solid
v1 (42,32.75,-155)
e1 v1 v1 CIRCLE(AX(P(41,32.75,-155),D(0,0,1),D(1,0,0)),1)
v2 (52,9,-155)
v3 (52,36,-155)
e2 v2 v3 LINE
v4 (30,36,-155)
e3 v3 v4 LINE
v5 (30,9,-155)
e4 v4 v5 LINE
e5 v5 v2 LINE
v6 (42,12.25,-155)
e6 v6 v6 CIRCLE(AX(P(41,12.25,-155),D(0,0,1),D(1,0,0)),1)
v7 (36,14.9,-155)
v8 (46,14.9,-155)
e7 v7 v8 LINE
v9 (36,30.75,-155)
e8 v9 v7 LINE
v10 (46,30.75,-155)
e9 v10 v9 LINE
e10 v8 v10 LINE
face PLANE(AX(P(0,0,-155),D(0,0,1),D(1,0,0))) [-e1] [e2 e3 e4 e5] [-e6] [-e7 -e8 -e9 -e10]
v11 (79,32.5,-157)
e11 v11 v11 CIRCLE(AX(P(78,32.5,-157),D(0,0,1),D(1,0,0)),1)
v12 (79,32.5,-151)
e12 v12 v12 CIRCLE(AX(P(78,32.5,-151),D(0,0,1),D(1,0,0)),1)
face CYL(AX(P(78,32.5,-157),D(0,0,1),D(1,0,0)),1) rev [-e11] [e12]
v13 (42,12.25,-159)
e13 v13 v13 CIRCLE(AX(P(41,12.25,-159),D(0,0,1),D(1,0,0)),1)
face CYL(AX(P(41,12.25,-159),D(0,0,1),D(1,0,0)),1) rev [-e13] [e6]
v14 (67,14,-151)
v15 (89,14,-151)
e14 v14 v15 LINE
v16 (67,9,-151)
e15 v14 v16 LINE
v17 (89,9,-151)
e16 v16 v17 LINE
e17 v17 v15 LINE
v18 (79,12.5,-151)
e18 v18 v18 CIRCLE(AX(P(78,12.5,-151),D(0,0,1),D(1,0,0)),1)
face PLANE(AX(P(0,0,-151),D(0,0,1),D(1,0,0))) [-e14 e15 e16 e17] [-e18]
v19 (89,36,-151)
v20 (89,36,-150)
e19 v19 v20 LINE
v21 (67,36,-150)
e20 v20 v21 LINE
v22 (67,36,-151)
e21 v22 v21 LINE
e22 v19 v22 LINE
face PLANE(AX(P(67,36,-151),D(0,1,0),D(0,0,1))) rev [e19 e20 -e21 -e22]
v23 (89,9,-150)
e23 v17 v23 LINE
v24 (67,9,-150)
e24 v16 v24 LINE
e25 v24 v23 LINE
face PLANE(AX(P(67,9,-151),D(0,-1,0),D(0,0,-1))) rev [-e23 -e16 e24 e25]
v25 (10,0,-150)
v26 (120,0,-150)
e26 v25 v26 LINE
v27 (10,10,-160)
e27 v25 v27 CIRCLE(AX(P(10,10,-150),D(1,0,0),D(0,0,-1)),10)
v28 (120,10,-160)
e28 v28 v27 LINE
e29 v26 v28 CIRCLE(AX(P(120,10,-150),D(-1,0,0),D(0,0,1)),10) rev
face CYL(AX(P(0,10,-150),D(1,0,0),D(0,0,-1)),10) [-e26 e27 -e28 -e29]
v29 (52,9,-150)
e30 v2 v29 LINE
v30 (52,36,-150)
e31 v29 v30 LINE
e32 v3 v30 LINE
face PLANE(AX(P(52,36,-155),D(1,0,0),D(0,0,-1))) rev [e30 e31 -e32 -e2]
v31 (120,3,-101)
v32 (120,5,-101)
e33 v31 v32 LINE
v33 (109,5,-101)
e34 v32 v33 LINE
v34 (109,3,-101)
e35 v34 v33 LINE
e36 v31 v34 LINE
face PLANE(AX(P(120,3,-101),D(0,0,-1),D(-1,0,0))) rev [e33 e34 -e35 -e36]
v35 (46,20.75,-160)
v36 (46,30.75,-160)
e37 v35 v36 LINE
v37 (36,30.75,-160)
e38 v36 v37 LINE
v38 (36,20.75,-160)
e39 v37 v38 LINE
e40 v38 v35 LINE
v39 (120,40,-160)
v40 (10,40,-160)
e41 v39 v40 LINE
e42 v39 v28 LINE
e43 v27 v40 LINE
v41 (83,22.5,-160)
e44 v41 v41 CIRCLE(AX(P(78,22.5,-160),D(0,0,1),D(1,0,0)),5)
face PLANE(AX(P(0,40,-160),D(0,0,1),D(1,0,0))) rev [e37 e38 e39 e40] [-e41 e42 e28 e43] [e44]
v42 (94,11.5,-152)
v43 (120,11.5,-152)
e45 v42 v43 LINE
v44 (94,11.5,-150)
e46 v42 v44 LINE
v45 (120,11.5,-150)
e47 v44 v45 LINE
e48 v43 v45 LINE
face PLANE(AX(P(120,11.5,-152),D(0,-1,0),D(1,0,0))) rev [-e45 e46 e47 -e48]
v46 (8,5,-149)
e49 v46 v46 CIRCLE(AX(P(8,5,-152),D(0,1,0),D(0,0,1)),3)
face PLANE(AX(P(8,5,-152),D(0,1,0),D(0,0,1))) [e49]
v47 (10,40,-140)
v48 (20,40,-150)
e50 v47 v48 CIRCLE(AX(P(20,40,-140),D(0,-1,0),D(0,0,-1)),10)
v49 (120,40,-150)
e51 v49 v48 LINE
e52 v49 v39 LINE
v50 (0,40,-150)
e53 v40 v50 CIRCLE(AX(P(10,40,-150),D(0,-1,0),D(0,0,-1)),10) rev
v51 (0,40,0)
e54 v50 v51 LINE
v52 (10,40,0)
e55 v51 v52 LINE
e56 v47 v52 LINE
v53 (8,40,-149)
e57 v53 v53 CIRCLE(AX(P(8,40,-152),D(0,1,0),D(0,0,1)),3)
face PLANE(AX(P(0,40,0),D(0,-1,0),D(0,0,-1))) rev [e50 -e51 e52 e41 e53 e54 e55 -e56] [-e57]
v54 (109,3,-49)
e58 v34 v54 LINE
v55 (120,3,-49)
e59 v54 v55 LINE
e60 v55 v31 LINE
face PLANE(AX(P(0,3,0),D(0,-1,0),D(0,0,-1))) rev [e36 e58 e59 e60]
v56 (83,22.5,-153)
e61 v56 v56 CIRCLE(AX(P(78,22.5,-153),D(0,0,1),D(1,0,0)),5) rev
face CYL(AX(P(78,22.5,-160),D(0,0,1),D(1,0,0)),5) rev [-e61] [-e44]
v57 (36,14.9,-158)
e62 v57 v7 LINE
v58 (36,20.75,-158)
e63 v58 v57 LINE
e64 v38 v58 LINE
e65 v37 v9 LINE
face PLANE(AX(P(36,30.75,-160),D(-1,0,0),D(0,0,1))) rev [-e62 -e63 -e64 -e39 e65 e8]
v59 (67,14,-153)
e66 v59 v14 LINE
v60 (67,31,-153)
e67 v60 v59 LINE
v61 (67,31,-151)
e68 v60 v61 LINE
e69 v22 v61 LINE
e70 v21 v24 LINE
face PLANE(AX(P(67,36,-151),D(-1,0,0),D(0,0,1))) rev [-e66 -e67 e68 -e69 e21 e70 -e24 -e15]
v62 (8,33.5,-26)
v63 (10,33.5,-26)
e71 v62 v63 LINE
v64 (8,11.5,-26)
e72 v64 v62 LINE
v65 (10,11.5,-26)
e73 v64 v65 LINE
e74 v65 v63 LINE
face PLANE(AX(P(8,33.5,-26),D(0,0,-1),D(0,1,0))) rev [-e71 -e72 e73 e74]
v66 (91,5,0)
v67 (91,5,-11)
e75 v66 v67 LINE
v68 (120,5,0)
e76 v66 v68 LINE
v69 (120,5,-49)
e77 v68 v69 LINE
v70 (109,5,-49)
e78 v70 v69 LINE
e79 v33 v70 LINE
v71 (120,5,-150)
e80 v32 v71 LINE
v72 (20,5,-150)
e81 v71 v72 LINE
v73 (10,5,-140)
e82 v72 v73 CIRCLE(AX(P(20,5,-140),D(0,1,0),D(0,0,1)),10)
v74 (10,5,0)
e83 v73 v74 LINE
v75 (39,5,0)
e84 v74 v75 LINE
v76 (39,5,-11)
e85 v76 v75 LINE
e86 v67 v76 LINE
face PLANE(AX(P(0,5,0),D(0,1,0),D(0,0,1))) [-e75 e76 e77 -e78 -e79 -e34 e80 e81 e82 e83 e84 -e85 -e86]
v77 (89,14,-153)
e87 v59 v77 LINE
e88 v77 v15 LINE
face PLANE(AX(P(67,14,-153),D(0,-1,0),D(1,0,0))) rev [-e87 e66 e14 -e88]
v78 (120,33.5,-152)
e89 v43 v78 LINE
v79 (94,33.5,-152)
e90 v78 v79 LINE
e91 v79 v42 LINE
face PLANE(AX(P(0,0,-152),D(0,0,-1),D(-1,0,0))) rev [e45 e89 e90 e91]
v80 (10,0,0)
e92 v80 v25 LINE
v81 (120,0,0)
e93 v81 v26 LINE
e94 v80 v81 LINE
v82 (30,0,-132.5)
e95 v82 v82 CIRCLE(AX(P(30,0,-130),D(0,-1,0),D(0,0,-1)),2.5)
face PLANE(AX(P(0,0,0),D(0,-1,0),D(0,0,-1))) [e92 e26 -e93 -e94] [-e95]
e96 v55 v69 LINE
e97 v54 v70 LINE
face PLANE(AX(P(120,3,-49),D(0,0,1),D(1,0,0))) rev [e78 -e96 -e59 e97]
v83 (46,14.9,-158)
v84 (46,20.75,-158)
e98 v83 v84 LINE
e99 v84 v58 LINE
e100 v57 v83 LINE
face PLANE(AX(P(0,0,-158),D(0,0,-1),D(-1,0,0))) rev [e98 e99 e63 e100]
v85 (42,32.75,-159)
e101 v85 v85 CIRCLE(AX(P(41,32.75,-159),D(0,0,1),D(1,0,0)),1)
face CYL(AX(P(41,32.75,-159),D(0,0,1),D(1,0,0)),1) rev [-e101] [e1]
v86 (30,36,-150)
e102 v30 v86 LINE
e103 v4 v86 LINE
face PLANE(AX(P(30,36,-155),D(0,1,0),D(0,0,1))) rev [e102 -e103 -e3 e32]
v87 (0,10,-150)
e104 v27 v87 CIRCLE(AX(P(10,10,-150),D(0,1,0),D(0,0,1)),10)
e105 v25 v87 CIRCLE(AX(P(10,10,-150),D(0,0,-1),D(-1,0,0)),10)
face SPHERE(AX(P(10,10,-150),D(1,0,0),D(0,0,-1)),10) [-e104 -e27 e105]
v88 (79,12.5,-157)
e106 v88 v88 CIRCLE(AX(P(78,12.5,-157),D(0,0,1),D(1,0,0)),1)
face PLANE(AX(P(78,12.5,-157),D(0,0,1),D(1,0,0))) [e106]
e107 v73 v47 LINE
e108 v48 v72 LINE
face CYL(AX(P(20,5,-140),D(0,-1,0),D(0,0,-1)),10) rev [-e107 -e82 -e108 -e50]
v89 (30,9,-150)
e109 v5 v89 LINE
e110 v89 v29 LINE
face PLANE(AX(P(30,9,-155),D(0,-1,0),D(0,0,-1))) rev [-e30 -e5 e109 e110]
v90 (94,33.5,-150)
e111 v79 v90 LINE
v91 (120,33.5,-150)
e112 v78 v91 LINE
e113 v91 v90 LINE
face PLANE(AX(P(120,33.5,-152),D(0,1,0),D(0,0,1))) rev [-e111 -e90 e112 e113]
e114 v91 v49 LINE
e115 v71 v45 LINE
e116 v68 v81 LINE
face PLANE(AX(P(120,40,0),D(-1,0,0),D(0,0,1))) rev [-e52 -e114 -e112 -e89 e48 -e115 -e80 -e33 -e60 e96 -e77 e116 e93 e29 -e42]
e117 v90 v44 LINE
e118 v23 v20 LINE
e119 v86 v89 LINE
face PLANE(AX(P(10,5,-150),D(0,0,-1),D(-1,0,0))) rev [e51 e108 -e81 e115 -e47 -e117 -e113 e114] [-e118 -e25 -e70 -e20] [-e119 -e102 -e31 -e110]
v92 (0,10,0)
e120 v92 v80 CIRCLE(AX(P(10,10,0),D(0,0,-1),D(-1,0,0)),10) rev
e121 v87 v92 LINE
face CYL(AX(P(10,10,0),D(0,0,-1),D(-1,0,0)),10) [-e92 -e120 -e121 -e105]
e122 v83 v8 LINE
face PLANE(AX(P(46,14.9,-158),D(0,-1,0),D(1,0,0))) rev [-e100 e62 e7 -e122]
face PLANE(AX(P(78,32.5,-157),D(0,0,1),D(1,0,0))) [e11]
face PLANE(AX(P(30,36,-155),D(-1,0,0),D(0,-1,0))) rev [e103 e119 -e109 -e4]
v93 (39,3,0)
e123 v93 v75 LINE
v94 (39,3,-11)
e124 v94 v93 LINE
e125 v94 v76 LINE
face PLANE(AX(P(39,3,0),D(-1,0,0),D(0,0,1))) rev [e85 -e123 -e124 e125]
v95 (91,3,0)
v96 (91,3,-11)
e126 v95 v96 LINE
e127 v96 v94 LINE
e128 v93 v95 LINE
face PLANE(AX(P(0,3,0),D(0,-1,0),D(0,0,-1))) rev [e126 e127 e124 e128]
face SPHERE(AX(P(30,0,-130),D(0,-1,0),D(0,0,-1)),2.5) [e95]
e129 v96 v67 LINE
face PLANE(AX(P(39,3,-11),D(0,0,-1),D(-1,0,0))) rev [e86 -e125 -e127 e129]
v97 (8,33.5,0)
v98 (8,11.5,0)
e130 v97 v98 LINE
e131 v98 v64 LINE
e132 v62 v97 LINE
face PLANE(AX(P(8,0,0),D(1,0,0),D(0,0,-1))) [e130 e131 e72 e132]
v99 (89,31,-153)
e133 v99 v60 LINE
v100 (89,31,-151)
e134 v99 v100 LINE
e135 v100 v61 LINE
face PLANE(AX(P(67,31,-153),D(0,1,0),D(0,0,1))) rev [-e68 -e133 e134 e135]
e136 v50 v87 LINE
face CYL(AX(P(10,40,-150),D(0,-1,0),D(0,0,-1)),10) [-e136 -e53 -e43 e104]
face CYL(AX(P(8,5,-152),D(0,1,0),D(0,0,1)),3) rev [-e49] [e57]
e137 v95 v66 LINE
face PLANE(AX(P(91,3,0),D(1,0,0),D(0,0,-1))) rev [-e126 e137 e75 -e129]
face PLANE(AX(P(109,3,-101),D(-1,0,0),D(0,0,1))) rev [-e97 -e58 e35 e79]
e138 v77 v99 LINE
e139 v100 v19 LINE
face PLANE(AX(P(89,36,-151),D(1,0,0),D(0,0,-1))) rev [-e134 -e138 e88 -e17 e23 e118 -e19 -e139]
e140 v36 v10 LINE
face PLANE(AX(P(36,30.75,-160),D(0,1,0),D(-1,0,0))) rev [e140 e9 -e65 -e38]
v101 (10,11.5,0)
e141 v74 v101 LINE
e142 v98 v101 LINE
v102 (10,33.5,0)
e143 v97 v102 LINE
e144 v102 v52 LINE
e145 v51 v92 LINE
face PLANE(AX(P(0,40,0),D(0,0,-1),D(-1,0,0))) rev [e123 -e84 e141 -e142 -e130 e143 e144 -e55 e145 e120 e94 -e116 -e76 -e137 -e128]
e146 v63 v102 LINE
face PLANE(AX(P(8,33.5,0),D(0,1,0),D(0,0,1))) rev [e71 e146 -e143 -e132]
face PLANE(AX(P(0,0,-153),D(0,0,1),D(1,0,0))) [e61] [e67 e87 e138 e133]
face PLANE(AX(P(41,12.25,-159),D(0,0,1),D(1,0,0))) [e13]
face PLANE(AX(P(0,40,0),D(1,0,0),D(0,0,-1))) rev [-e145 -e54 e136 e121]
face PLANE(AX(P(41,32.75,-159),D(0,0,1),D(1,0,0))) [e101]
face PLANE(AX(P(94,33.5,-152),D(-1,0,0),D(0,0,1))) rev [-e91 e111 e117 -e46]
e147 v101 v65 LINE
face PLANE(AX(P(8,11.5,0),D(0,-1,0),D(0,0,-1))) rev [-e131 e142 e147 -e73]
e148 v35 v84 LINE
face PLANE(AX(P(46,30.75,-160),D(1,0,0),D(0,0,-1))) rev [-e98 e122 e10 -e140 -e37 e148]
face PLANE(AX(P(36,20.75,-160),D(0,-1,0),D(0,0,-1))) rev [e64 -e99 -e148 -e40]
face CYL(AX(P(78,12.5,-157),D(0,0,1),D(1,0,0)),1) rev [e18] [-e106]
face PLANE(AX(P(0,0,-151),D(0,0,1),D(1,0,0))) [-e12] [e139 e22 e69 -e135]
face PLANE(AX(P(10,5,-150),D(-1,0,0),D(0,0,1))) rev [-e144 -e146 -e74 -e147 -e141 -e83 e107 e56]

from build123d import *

# Parameters (mm, degrees)
ESQUISSE1_W              = 120
ESQUISSE1_H              = 160
BOSS_EXTRU_1_DEPTH       = 40
ESQUISSE2_W              = 110
ESQUISSE2_H              = 150
ENL_V_MAT_EXTRU_1_DEPTH  = 35
CONG_1_R                 = 10
CONG_2_R                 = 10
CONG_3_R                 = 10
ESQUISSE3_R              = 2.5
BOSS_EXTRU_2_DEPTH       = 2.5
CONG_4_R                 = 2.5
ESQUISSE4_R              = 3
ENL_V_MAT_EXTRU_2_DEPTH  = 35
ESQUISSE5_W              = 11
ESQUISSE5_H              = 52
ENL_V_MAT_EXTRU_3_DEPTH  = 2
ESQUISSE6_W              = 52
ESQUISSE6_H              = 11
ENL_V_MAT_EXTRU_4_DEPTH  = 2
ESQUISSE8_W              = 22
ESQUISSE8_H              = 27
ENL_V_MAT_EXTRU_6_DEPTH  = 5
ESQUISSE10_R             = 1
ENL_V_MAT_EXTRU_7_DEPTH  = 4
ESQUISSE11_W             = 10
ESQUISSE11_H             = 10
ENL_V_MAT_EXTRU_8_DEPTH  = 201.062490237
ESQUISSE12_W             = 10
ESQUISSE12_H             = 5.85
ENL_V_MAT_EXTRU_9_DEPTH  = 3
ESQUISSE13_W             = 22
ESQUISSE13_H             = 27
ENL_V_MAT_EXTRU_10_DEPTH = 1
ESQUISSE14_R             = 1
ENL_V_MAT_EXTRU_11_DEPTH = 6
ESQUISSE15_R             = 5
ENL_V_MAT_EXTRU_12_DEPTH = 197.979694385
ESQUISSE16_W             = 22
ESQUISSE16_H             = 17
ENL_V_MAT_EXTRU_13_DEPTH = 2
ESQUISSE17_W             = 26
ESQUISSE17_H             = 22
ENL_V_MAT_EXTRU_14_DEPTH = 2
ESQUISSE18_W             = 26
ESQUISSE18_H             = 22
ENL_V_MAT_EXTRU_15_DEPTH = 2


with BuildPart() as part:
    # Esquisse1 → Boss.-Extru.1 (new body)
    with BuildSketch(Plane(origin=(0, 0, 0), x_dir=(1, 0, 0), z_dir=(0, 1, 0))):
        with Locations((60, 80)):
            Rectangle(ESQUISSE1_W, ESQUISSE1_H)
    extrude(amount=BOSS_EXTRU_1_DEPTH)

    # Esquisse2 → Enlèv. mat.-Extru.1 (cut)
    with BuildSketch(Plane(origin=(0, 40, 0), x_dir=(1, 0, 0), z_dir=(0, 1, 0))):
        with Locations((65, 75)):
            Rectangle(ESQUISSE2_W, ESQUISSE2_H)
    extrude(amount=-ENL_V_MAT_EXTRU_1_DEPTH, mode=Mode.SUBTRACT)

    # Congé1
    cong_1_edges = [part.edges().sort_by_distance(p)[0] for p in [
        (60, 0, -160),
    ]]
    fillet(cong_1_edges, radius=CONG_1_R)

    # Congé2
    cong_2_edges = [part.edges().sort_by_distance(p)[0] for p in [
        (0, 0, -75),
        (0, 2.928932188, -157.071067812),
        (0, 25, -160),
    ]]
    fillet(cong_2_edges, radius=CONG_2_R)

    # Congé3
    cong_3_edges = [part.edges().sort_by_distance(p)[0] for p in [
        (10, 22.5, -150),
    ]]
    fillet(cong_3_edges, radius=CONG_3_R)

    # Esquisse3 → Boss.-Extru.2 (add)
    with BuildSketch(Plane.XZ):
        with Locations(Location((30, -130, 0), (0, 0, 270))):
            Circle(ESQUISSE3_R)
    extrude(amount=BOSS_EXTRU_2_DEPTH)

    # Congé4
    cong_4_edges = [part.edges().sort_by_distance(p)[0] for p in [
        (30, -2.5, -127.5),
    ]]
    fillet(cong_4_edges, radius=CONG_4_R - 0.0001)  # a hair under: the kernel refuses the full size

    # Esquisse4 → Enlèv. mat.-Extru.2 (cut)
    with BuildSketch(Plane(origin=(0, 40, 0), x_dir=(1, 0, 0), z_dir=(0, 1, 0))):
        with Locations(Location((8, 152, 0), (0, 0, 270))):
            Circle(ESQUISSE4_R)
    extrude(amount=-ENL_V_MAT_EXTRU_2_DEPTH, mode=Mode.SUBTRACT)

    # Esquisse5 → Enlèv. mat.-Extru.3 (cut)
    with BuildSketch(Plane(origin=(0, 5, 0), x_dir=(1, 0, 0), z_dir=(0, 1, 0))):
        with Locations((114.5, 75)):
            Rectangle(ESQUISSE5_W, ESQUISSE5_H)
    extrude(amount=-ENL_V_MAT_EXTRU_3_DEPTH, mode=Mode.SUBTRACT)

    # Esquisse6 → Enlèv. mat.-Extru.4 (cut)
    with BuildSketch(Plane(origin=(0, 5, 0), x_dir=(1, 0, 0), z_dir=(0, 1, 0))):
        with Locations((65, 5.5)):
            Rectangle(ESQUISSE6_W, ESQUISSE6_H)
    extrude(amount=-ENL_V_MAT_EXTRU_4_DEPTH, mode=Mode.SUBTRACT)

    # Esquisse8 → Enlèv. mat.-Extru.6 (cut)
    with BuildSketch(Plane.XY.offset(-150)):
        with Locations((41, 22.5)):
            Rectangle(ESQUISSE8_W, ESQUISSE8_H)
    extrude(amount=-ENL_V_MAT_EXTRU_6_DEPTH, mode=Mode.SUBTRACT)

    # Esquisse10 → Enlèv. mat.-Extru.7 (cut)
    with BuildSketch(Plane.XY.offset(-155)):
        with Locations((41, 32.75)):
            Circle(ESQUISSE10_R)
        with Locations((41, 12.25)):
            Circle(ESQUISSE10_R)
    extrude(amount=-ENL_V_MAT_EXTRU_7_DEPTH, mode=Mode.SUBTRACT)

    # Esquisse11 → Enlèv. mat.-Extru.8 (cut, through all)
    with BuildSketch(Plane.XY.offset(-155)):
        with Locations((41, 25.75)):
            Rectangle(ESQUISSE11_W, ESQUISSE11_H)
    extrude(amount=-ENL_V_MAT_EXTRU_8_DEPTH, mode=Mode.SUBTRACT)

    # Esquisse12 → Enlèv. mat.-Extru.9 (cut)
    with BuildSketch(Plane.XY.offset(-155)):
        with Locations((41, 17.825)):
            Rectangle(ESQUISSE12_W, ESQUISSE12_H)
    extrude(amount=-ENL_V_MAT_EXTRU_9_DEPTH, mode=Mode.SUBTRACT)

    # Esquisse13 → Enlèv. mat.-Extru.10 (cut)
    with BuildSketch(Plane.XY.offset(-150)):
        with Locations((78, 22.5)):
            Rectangle(ESQUISSE13_W, ESQUISSE13_H)
    extrude(amount=-ENL_V_MAT_EXTRU_10_DEPTH, mode=Mode.SUBTRACT)

    # Esquisse14 → Enlèv. mat.-Extru.11 (cut)
    with BuildSketch(Plane.XY.offset(-151)):
        with Locations((78, 32.5)):
            Circle(ESQUISSE14_R)
        with Locations((78, 12.5)):
            Circle(ESQUISSE14_R)
    extrude(amount=-ENL_V_MAT_EXTRU_11_DEPTH, mode=Mode.SUBTRACT)

    # Esquisse15 → Enlèv. mat.-Extru.12 (cut, through all)
    with BuildSketch(Plane.XY.offset(-151)):
        with Locations((78, 22.5)):
            Circle(ESQUISSE15_R)
    extrude(amount=-ENL_V_MAT_EXTRU_12_DEPTH, mode=Mode.SUBTRACT)

    # Esquisse16 → Enlèv. mat.-Extru.13 (cut)
    with BuildSketch(Plane.XY.offset(-151)):
        with Locations((78, 22.5)):
            Rectangle(ESQUISSE16_W, ESQUISSE16_H)
    extrude(amount=-ENL_V_MAT_EXTRU_13_DEPTH, mode=Mode.SUBTRACT)

    # Esquisse17 → Enlèv. mat.-Extru.14 (cut)
    with BuildSketch(Plane.XY.offset(-150)):
        with Locations((107, 22.5)):
            Rectangle(ESQUISSE17_W, ESQUISSE17_H)
    extrude(amount=-ENL_V_MAT_EXTRU_14_DEPTH, mode=Mode.SUBTRACT)

    # Esquisse18 → Enlèv. mat.-Extru.15 (cut)
    with BuildSketch(Plane(origin=(10, 0, 0), x_dir=(0, 0, -1), z_dir=(1, 0, 0))):
        with Locations((13, 22.5)):
            Rectangle(ESQUISSE18_W, ESQUISSE18_H)
    extrude(amount=-ENL_V_MAT_EXTRU_15_DEPTH, mode=Mode.SUBTRACT)


solid = part.part
